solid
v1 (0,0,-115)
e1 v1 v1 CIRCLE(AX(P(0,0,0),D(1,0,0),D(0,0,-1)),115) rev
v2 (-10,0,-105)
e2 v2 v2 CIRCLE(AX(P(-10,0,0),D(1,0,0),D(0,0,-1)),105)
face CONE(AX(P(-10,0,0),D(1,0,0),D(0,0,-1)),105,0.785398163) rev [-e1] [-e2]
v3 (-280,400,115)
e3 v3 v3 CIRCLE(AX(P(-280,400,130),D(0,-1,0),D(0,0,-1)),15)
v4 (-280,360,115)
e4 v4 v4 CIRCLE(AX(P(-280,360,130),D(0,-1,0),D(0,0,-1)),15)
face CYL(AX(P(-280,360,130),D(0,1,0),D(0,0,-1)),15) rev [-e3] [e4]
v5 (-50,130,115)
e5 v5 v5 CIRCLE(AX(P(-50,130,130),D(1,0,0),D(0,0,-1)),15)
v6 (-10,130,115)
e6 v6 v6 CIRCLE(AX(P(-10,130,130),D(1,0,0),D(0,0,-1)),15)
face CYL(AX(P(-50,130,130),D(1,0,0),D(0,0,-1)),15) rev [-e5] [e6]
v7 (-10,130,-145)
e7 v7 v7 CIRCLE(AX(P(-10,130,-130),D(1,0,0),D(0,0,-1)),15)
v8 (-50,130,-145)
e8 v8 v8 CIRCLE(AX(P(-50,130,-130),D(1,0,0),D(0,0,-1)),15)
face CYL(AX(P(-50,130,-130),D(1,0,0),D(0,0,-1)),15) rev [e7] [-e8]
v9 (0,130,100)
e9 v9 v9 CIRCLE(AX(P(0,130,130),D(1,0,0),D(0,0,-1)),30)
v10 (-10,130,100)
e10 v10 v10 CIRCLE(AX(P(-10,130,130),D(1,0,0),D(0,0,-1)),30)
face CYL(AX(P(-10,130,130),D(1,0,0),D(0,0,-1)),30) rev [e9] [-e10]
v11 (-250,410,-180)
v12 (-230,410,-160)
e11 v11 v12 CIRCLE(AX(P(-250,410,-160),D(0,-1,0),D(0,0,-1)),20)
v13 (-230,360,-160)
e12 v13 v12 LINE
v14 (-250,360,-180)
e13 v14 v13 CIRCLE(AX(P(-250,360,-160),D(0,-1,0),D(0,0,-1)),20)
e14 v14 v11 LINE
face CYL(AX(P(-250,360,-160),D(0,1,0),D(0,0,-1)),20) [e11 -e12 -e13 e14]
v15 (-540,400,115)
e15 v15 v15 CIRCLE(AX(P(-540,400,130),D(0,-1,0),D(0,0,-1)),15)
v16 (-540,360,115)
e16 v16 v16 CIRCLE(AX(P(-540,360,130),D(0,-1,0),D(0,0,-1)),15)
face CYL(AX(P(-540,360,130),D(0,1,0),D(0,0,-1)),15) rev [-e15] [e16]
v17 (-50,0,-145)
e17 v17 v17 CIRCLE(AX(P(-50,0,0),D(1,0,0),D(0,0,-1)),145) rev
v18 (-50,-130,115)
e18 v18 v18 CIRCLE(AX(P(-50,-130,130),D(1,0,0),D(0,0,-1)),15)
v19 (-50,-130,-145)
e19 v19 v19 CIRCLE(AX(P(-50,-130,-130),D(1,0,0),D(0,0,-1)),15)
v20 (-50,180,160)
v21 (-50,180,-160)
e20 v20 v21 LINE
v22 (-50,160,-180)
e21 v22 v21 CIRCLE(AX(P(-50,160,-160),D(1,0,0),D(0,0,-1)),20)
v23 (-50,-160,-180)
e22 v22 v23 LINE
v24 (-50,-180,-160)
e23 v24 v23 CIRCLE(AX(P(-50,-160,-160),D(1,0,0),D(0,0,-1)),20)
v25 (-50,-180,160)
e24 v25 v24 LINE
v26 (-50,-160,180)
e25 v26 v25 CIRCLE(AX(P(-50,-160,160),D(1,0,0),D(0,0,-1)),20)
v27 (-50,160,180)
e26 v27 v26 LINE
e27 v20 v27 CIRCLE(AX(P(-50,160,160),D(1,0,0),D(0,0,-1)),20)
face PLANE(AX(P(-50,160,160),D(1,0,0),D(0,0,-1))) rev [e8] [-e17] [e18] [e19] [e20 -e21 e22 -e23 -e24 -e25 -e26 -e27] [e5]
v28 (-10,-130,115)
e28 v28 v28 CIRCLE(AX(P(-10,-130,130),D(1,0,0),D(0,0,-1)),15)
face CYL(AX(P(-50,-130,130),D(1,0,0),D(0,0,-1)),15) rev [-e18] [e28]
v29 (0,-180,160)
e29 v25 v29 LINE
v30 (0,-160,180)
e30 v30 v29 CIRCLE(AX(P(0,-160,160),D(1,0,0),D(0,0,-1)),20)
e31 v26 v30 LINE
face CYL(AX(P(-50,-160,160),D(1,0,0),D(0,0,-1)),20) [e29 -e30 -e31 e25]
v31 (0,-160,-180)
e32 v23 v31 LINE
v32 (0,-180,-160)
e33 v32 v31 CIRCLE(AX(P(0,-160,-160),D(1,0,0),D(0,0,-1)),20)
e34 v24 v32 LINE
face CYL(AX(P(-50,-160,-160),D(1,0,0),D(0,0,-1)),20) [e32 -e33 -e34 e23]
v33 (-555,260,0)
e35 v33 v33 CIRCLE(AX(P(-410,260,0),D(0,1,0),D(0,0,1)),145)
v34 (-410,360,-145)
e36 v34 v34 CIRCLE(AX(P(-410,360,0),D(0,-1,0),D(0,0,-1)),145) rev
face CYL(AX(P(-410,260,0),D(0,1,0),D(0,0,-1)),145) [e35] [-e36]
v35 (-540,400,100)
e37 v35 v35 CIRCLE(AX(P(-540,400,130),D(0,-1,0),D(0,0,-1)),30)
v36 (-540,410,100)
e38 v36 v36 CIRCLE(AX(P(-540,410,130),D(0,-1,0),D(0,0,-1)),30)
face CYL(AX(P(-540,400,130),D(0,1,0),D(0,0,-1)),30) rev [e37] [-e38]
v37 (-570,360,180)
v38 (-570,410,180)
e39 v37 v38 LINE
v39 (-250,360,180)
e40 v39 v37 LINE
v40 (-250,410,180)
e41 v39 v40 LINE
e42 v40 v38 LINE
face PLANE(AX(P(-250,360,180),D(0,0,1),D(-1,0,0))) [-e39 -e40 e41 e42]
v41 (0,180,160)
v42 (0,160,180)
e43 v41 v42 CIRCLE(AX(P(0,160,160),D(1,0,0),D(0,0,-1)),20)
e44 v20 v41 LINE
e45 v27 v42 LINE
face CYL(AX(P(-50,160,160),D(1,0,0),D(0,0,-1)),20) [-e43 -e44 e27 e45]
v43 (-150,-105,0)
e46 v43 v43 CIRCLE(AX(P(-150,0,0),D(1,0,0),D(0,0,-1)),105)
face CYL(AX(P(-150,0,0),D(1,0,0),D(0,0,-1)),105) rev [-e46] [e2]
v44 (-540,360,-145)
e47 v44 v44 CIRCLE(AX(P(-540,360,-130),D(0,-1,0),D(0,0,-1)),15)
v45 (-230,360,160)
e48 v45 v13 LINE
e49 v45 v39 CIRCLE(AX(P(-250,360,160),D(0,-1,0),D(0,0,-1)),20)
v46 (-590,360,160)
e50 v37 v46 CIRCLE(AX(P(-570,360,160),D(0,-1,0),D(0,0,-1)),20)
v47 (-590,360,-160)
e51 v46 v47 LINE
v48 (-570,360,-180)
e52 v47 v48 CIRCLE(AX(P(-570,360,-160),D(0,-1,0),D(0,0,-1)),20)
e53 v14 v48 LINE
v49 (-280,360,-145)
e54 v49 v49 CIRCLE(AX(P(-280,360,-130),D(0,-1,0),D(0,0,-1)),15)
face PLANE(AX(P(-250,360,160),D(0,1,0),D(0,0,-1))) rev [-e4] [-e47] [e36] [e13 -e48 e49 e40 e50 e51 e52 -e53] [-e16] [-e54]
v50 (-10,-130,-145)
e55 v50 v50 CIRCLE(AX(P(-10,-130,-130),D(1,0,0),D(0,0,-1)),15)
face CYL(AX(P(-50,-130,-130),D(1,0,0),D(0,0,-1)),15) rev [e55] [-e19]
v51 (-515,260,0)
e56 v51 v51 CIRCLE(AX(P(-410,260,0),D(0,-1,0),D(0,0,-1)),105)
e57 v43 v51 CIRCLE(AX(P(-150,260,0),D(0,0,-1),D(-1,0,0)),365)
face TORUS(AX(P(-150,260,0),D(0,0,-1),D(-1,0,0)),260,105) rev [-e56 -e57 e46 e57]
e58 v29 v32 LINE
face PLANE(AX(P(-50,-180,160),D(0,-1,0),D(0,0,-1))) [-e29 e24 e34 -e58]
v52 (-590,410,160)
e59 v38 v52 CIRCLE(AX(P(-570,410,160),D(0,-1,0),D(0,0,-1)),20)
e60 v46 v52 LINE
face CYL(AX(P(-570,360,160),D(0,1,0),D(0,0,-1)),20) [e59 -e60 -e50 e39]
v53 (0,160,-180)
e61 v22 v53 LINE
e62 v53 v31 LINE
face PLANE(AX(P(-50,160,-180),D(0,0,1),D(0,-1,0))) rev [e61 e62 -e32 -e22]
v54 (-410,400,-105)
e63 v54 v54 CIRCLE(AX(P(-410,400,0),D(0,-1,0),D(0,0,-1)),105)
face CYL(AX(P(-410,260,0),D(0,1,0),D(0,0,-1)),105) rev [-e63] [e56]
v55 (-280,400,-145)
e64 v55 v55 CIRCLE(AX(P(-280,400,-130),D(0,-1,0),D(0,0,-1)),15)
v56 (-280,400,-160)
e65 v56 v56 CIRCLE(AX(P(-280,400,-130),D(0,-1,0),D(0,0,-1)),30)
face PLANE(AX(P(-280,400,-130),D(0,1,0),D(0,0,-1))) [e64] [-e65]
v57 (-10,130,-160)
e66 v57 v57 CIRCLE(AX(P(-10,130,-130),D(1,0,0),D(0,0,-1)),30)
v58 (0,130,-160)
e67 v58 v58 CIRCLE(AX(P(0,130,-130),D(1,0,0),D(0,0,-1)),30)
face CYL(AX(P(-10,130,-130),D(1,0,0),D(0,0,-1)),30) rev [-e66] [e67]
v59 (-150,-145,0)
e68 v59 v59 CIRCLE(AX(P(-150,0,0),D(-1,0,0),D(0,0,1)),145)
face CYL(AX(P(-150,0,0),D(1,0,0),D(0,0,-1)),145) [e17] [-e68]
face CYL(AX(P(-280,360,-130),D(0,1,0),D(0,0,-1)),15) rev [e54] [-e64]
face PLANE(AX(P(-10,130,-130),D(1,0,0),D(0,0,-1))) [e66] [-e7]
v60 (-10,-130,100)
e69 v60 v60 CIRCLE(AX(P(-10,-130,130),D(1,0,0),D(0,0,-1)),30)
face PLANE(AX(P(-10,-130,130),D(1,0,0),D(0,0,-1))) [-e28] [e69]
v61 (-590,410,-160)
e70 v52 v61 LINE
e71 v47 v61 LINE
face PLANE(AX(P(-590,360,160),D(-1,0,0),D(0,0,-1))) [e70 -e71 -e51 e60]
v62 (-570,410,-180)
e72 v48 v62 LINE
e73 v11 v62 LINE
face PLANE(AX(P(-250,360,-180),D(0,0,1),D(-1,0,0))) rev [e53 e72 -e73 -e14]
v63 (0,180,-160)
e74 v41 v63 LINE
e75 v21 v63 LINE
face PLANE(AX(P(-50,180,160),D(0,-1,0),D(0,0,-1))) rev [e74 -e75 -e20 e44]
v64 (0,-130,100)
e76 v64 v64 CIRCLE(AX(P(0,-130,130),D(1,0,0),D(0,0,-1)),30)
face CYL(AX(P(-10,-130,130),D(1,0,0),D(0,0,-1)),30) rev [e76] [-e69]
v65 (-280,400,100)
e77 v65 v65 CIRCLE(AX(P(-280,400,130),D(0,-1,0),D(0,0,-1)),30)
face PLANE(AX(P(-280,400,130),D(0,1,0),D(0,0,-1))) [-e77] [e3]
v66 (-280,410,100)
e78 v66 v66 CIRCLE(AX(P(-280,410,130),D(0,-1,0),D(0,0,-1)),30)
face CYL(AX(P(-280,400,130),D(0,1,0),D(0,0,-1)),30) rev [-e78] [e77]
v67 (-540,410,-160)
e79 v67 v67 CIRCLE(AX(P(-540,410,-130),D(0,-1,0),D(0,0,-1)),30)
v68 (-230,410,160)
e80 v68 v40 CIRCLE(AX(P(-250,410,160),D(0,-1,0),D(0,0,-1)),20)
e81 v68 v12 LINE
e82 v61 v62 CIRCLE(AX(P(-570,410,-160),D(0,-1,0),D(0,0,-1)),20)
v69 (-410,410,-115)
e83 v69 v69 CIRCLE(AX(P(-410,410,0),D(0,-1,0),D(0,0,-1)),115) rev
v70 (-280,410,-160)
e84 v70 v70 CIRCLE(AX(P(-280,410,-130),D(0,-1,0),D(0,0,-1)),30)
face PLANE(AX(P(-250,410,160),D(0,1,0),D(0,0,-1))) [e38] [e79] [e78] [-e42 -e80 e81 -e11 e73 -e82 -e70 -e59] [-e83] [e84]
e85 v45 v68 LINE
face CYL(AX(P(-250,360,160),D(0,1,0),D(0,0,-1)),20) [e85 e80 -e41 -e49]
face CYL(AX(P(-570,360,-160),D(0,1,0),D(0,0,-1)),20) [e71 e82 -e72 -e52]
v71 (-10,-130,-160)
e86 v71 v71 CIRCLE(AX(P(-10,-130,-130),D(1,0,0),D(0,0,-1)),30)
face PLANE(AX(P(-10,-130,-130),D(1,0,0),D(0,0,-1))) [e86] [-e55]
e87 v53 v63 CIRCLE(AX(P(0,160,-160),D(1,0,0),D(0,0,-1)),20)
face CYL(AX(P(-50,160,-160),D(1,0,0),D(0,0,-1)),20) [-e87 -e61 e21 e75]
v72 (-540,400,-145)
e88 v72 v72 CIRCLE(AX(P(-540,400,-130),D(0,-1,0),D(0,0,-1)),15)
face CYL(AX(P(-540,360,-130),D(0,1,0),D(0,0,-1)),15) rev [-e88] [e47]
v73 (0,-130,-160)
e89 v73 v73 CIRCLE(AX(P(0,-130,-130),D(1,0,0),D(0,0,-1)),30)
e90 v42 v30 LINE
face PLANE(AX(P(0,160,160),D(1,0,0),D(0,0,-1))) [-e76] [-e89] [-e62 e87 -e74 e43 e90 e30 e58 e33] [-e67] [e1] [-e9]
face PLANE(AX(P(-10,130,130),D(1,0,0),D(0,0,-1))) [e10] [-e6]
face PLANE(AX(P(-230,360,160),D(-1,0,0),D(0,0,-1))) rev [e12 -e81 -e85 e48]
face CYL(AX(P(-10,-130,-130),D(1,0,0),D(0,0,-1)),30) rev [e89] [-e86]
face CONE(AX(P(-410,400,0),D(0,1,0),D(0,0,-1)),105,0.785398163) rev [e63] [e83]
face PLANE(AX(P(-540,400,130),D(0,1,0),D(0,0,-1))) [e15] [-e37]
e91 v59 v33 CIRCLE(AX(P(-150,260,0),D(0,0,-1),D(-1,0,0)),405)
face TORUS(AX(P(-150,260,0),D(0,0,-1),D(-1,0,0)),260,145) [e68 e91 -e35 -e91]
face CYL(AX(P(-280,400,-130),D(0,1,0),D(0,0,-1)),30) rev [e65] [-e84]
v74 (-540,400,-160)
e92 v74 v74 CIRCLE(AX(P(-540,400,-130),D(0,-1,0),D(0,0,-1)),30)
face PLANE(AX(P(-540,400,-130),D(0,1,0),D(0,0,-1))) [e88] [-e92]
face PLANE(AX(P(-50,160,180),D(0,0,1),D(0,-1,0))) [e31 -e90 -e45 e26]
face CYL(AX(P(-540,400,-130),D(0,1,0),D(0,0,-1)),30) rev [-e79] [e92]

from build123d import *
from build123d.topology import SkipClean

# Parameters (mm, degrees)
BOSS_EXTRUDE1_DEPTH = 50
SKETCH2_R           = 30
CUT_EXTRUDE1_DEPTH  = 10
SKETCH5_R           = 15
CUT_EXTRUDE2_DEPTH  = 258.681974535
SKETCH6_R           = 145
BOSS_EXTRUDE3_DEPTH = 100
SKETCH7_R           = 105
CUT_EXTRUDE3_DEPTH  = 296.465734054
CHAMFER1_SIZE       = 10
SWEEP1_OUTLINE_R    = 145
SWEEP1_OUTLINE_R_2  = 105
SWEEP1_ANGLE        = 45


# Read off the part's stored shape, not the designer's step: Sweep1
with BuildPart() as part:
    # Sketch1 → Boss-Extrude1 (new body)
    with BuildSketch(Plane(origin=(0, 0, 0), x_dir=(0, 0, -1), z_dir=(1, 0, 0))):
        with BuildLine():
            Line((-160, 180), (160, 180))
            ThreePointArc((160, 180), (174.142135624, 174.142135624), (180, 160))
            Line((180, 160), (180, -160))
            ThreePointArc((180, -160), (174.142135624, -174.142135624), (160, -180))
            Line((160, -180), (-160, -180))
            ThreePointArc((-160, -180), (-174.142135624, -174.142135624), (-180, -160))
            Line((-180, -160), (-180, 160))
            ThreePointArc((-180, 160), (-174.142135624, 174.142135624), (-160, 180))
        make_face()
    extrude(amount=-BOSS_EXTRUDE1_DEPTH)

    # Sketch2 → Cut-Extrude1 (cut)
    with BuildSketch(Plane(origin=(0, 0, 0), x_dir=(0, 0, -1), z_dir=(1, 0, 0))):
        with Locations((-130, 130)):
            Circle(SKETCH2_R)
        with Locations((130, 130)):
            Circle(SKETCH2_R)
        with Locations((130, -130)):
            Circle(SKETCH2_R)
        with Locations((-130, -130)):
            Circle(SKETCH2_R)
    extrude(amount=-CUT_EXTRUDE1_DEPTH, mode=Mode.SUBTRACT)

    # Sketch5 → Cut-Extrude2 (cut, through all)
    with BuildSketch(Plane(origin=(-10, 0, 0), x_dir=(0, 0, -1), z_dir=(1, 0, 0))):
        with Locations((-130, 130)):
            Circle(SKETCH5_R)
        with Locations((130, 130)):
            Circle(SKETCH5_R)
        with Locations((130, -130)):
            Circle(SKETCH5_R)
        with Locations((-130, -130)):
            Circle(SKETCH5_R)
    extrude(amount=-CUT_EXTRUDE2_DEPTH, mode=Mode.SUBTRACT)

    # Sketch6 → Boss-Extrude3 (add)
    with BuildSketch(Plane.ZY.offset(50)):
        with Locations(Location((0, 0, 0), (0, 0, 180))):
            Circle(SKETCH6_R)
    extrude(amount=BOSS_EXTRUDE3_DEPTH)

    # Sketch7 → Cut-Extrude3 (cut, through all)
    with BuildSketch(Plane(origin=(0, 0, 0), x_dir=(0, 0, -1), z_dir=(1, 0, 0))):
        Circle(SKETCH7_R)
    extrude(amount=-CUT_EXTRUDE3_DEPTH, mode=Mode.SUBTRACT)

    # Chamfer1
    chamfer1_edges = [part.edges().sort_by_distance(p)[0] for p in [
        (0, 0, 105),
    ]]
    chamfer(chamfer1_edges, length=CHAMFER1_SIZE)

    # Sweep1 outline → Sweep1 (revolve)
    with BuildSketch(Plane(origin=(-150, 260, 0), x_dir=(-0.707106781186543, -0.707106781186552, 0), z_dir=(-0.707106781186552, 0.707106781186543, 0))):
        with Locations((260, 0)):
            Circle(SWEEP1_OUTLINE_R)
        with Locations((260, 0)):
            Circle(SWEEP1_OUTLINE_R_2, mode=Mode.SUBTRACT)
    revolve(axis=Axis((-150, 260, 0), (0, 0, 1)), revolution_arc=SWEEP1_ANGLE)

    # Mirror3: part across plane


with BuildPart() as part_1:
    with SkipClean():  # the faces are left unmerged after this step: merging them gives an invalid solid
        add(part.part)
        add(part.part.mirror(Plane(origin=(-333.847763109, 76.152236891, 0), x_dir=(0, 0, 1), z_dir=(-0.7071067811865515, 0.7071067811865437, 0))))


solid = part_1.part
